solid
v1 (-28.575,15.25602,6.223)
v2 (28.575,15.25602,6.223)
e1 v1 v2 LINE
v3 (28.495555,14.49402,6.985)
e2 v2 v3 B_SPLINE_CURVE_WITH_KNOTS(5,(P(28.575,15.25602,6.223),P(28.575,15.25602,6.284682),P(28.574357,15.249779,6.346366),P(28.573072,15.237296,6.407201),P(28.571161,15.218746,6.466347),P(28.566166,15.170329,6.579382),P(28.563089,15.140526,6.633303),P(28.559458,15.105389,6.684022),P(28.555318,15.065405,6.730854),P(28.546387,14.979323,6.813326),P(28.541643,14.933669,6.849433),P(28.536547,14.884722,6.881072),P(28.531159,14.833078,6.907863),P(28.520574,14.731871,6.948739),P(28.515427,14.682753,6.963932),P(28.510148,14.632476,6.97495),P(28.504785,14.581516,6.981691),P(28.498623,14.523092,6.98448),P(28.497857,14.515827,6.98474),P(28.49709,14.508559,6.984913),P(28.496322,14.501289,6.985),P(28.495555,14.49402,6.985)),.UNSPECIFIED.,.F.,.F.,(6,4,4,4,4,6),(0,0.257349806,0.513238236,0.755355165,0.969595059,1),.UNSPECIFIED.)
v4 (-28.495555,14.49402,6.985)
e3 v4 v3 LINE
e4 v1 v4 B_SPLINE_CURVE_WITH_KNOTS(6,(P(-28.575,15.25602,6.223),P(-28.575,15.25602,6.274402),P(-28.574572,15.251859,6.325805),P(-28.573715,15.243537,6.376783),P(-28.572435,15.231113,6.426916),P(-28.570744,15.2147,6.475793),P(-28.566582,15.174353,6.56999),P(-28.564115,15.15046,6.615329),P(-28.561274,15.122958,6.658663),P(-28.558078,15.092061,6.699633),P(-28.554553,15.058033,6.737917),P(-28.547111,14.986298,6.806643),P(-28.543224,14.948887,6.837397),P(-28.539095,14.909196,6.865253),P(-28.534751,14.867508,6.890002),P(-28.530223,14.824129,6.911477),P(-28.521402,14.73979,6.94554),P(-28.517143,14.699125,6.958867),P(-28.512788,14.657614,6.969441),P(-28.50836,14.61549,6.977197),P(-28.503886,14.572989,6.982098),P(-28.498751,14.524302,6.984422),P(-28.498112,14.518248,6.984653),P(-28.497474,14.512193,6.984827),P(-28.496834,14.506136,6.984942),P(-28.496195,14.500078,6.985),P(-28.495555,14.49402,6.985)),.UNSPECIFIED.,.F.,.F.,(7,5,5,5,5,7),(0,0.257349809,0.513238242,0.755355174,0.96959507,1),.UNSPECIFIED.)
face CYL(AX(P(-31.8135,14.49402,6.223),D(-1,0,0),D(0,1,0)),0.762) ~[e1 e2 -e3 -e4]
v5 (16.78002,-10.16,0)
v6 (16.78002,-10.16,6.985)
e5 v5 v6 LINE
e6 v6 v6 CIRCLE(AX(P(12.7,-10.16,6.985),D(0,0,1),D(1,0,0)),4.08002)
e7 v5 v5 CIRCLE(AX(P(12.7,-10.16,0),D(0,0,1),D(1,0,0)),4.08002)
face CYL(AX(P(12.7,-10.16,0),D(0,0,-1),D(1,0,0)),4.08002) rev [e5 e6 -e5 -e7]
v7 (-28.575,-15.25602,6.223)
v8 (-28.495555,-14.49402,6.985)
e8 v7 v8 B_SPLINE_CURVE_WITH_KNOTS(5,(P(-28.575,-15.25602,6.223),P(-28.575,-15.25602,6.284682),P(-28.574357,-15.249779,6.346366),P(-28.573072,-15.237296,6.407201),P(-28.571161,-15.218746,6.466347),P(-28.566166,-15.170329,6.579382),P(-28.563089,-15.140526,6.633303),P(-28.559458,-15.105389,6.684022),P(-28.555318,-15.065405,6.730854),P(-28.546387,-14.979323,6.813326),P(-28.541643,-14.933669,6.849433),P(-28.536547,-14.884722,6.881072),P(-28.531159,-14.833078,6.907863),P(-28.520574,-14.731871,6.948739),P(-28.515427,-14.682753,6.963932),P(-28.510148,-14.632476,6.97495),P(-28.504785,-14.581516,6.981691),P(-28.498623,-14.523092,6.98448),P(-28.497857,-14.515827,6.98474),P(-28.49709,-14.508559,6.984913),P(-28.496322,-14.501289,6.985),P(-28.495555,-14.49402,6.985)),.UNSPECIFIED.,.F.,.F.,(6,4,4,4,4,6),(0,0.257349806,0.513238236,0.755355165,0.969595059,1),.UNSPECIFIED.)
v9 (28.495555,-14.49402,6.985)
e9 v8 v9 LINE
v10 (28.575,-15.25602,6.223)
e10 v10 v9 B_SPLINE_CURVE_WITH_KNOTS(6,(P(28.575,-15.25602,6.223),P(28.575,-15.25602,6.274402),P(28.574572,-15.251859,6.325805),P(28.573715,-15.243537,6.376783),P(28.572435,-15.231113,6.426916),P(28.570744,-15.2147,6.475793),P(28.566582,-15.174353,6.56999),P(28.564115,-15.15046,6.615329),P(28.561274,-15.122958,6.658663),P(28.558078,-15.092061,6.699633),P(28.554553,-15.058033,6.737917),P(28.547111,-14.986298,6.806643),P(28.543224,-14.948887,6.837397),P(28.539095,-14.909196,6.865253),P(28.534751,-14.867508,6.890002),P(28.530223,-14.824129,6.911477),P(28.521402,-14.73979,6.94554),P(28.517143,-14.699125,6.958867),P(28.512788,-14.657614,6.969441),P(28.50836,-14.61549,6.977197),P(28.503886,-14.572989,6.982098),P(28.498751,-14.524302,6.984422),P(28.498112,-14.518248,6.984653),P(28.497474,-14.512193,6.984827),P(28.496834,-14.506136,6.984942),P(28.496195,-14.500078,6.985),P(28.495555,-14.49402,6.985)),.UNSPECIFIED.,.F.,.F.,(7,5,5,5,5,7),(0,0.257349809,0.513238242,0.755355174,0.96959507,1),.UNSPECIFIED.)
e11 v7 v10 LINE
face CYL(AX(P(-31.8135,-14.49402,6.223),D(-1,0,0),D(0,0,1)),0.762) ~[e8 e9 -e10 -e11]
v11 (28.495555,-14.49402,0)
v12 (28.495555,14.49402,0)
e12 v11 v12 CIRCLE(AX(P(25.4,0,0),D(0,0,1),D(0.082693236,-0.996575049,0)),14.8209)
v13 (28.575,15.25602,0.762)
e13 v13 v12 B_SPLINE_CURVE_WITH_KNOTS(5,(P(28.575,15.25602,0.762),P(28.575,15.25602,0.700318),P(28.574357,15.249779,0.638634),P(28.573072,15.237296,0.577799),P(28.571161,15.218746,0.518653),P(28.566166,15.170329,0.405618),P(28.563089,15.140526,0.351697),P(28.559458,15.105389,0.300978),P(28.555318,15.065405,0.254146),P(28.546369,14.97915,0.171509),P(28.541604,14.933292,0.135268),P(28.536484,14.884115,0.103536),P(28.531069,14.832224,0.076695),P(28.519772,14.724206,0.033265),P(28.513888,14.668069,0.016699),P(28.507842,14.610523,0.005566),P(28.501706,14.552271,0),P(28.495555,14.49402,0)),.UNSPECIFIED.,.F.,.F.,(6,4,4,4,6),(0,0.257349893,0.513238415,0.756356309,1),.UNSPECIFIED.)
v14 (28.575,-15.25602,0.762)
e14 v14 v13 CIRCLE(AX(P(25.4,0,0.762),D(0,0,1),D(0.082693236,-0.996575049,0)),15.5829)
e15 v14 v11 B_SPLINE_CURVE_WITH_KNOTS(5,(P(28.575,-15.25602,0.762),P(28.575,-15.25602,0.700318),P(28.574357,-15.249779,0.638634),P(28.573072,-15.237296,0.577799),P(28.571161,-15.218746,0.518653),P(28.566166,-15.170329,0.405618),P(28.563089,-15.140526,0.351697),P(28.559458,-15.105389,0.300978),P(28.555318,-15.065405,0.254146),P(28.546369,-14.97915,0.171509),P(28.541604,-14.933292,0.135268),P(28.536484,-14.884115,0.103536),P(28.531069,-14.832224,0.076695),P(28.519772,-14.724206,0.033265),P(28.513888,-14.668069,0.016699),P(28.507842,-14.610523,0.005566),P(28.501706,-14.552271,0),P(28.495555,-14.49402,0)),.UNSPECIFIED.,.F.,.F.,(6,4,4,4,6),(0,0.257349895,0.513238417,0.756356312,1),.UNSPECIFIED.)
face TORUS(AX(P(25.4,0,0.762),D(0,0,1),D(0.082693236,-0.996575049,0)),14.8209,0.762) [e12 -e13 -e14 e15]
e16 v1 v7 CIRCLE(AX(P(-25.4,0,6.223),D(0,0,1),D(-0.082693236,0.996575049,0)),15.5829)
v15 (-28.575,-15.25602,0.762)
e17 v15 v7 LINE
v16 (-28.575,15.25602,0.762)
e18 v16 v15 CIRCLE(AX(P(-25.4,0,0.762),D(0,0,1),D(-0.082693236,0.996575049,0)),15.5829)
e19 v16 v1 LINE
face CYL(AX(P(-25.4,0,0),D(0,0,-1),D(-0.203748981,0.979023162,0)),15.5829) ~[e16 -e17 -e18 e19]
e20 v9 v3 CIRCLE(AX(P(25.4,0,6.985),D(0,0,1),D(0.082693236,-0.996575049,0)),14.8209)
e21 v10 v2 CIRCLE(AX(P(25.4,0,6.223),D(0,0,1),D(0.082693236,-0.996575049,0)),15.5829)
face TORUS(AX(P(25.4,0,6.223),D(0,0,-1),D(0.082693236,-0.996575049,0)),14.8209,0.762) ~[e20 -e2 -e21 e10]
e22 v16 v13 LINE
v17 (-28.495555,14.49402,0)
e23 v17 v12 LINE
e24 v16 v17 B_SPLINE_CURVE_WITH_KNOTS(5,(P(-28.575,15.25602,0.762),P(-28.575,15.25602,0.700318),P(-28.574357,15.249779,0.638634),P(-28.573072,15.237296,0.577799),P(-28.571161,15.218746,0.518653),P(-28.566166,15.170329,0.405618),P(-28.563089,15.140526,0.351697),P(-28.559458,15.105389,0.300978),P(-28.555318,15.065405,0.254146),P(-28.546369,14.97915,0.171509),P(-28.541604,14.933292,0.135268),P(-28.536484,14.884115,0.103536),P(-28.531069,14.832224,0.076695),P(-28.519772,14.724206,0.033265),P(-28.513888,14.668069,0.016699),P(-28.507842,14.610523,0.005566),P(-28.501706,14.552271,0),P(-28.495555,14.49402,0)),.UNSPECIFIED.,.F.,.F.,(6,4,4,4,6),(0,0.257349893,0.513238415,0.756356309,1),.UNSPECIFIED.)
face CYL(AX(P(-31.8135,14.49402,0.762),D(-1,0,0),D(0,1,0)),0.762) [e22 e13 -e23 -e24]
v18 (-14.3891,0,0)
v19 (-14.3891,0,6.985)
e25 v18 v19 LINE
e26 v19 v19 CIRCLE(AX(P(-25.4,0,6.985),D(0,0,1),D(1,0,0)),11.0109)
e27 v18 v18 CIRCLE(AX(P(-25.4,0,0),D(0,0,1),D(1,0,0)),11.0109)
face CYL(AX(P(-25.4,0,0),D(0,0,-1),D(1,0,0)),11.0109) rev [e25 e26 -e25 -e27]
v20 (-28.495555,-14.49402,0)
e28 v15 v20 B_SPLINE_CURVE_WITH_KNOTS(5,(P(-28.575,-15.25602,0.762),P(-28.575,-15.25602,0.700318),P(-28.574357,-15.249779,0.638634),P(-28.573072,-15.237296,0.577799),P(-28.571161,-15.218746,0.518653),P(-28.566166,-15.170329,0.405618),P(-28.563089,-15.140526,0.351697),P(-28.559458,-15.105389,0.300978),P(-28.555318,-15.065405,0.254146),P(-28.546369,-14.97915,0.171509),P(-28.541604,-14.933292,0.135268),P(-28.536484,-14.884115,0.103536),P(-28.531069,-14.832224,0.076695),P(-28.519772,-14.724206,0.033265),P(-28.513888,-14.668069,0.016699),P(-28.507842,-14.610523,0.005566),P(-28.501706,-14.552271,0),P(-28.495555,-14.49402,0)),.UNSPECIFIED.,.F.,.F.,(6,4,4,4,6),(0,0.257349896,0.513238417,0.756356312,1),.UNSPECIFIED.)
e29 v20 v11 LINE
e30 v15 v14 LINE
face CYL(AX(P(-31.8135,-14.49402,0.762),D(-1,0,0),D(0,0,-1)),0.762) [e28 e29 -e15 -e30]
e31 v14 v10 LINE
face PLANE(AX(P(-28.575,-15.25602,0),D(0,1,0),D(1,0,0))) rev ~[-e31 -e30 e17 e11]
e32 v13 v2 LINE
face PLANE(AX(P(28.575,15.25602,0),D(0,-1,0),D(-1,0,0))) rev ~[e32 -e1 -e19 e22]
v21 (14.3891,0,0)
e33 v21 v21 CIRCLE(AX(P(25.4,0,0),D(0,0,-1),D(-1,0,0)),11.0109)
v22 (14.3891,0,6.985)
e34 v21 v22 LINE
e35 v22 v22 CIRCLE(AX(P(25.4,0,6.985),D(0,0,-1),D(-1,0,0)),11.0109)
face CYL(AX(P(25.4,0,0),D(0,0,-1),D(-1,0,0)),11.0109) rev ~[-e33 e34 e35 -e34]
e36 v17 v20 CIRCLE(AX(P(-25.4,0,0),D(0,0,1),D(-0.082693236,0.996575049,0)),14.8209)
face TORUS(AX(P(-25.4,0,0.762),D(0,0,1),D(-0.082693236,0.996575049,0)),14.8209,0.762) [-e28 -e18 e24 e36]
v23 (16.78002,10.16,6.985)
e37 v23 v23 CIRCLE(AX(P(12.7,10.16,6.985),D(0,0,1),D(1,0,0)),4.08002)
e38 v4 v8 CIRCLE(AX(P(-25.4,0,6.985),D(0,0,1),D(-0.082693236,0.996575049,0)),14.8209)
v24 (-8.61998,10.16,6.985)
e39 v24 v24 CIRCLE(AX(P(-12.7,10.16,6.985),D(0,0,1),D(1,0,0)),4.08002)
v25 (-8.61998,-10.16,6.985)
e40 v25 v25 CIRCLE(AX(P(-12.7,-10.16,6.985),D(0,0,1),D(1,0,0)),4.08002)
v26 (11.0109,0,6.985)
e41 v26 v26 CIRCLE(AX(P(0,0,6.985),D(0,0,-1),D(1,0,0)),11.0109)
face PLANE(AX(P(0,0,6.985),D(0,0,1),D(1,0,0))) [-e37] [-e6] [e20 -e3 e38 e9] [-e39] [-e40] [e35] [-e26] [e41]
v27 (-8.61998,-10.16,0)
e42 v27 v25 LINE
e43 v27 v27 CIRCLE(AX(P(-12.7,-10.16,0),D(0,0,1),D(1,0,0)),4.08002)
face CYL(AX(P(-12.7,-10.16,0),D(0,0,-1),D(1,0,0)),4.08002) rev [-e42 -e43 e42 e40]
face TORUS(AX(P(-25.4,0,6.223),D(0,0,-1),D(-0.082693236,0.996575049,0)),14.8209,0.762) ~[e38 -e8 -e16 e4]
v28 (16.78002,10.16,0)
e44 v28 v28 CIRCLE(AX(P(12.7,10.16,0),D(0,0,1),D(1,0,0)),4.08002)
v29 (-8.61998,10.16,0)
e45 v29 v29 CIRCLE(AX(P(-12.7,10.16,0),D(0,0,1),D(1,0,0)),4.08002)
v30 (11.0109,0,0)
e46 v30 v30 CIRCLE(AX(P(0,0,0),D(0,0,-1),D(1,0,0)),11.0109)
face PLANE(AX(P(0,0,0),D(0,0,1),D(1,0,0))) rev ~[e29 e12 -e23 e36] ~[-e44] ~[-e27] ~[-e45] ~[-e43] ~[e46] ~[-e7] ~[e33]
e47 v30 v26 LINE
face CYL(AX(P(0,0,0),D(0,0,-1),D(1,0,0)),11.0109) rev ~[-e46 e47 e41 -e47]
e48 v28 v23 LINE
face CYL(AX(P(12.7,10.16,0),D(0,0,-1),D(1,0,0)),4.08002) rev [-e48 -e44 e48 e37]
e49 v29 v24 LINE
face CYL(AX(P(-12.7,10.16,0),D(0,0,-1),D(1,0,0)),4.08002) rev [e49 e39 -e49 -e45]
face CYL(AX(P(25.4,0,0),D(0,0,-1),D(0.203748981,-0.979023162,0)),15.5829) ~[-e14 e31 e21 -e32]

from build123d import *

# Parameters (mm, degrees)
F0_R        = 4.0800200383
F0_R_2      = 11.0109
F1_DEPTH    = 6.985
F2_T1_DEPTH = 63.627
F2_T4_ANGLE = 170.5132200492
F2_T6_ANGLE = 170.5132200492
F3_T1_DEPTH = 63.627
F3_T4_ANGLE = 170.5132200492
F3_T6_ANGLE = 170.5132200492


# Not quite as in the source:
# - a fillet or chamfer that OpenCascade refuses, or shapes differently, is made with other operations: its cross-section is extruded or revolved along the edge and cut away or added


with BuildPart() as f1:
    # F0 (on Top) → F1 (new body)
    with BuildSketch(Plane.XY):
        with BuildLine():
            Line((28.575, 15.2560200383), (-28.575, 15.2560200383))
            ThreePointArc((-28.575, 15.2560200383), (-40.9829, 0), (-28.575, -15.2560200383))
            Line((-28.575, -15.2560200383), (28.575, -15.2560200383))
            ThreePointArc((28.575, -15.2560200383), (40.9829, 0), (28.575, 15.2560200383))
        make_face()
        with Locations((-12.7, -10.16)):
            Circle(F0_R, mode=Mode.SUBTRACT)
        with Locations((12.7, -10.16)):
            Circle(F0_R, mode=Mode.SUBTRACT)
        with Locations((-25.4, 0)):
            Circle(F0_R_2, mode=Mode.SUBTRACT)
        with Locations((-12.7, 10.16)):
            Circle(F0_R, mode=Mode.SUBTRACT)
        with BuildLine():
            ThreePointArc((-11.0109, 0), (0, 11.0109), (11.0109, 0))
            ThreePointArc((11.0109, 0), (0, -11.0109), (-11.0109, 0))
        make_face(mode=Mode.SUBTRACT)
        with BuildLine():
            ThreePointArc((36.4109, 0), (25.4, -11.0109), (14.3891, 0))
            ThreePointArc((14.3891, 0), (25.4, 11.0109), (36.4109, 0))
        make_face(mode=Mode.SUBTRACT)
        with Locations((12.7, 10.16)):
            Circle(F0_R, mode=Mode.SUBTRACT)
    extrude(amount=F1_DEPTH)

    # F2: fillet of radius 0.762 on 4 edges, made by hand

    # F2_s2 → F2_t1 (cut)
    with BuildSketch(Plane.YZ.offset(-31.8135)):
        with BuildLine():
            ThreePointArc((-14.4940200383, 6.985), (-15.0328354056, 6.7618153673), (-15.2560200383, 6.223))
            Line((-15.2560200383, 6.223), (-15.2560200383, 6.985))
            Line((-15.2560200383, 6.985), (-14.4940200383, 6.985))
        make_face()
        with BuildLine():
            ThreePointArc((15.2560200383, 6.223), (15.0328354056, 6.7618153673), (14.4940200383, 6.985))
            Line((14.4940200383, 6.985), (15.2560200383, 6.985))
            Line((15.2560200383, 6.985), (15.2560200383, 6.223))
        make_face()
    extrude(amount=F2_T1_DEPTH, mode=Mode.SUBTRACT)

    # F2_s3 → F2_t4 (revolve, cut)
    with BuildSketch(Plane(origin=(-25.2263104474, -2.0932144122, 0), x_dir=(0, 0, 1), z_dir=(0.9965750492, 0.0826932365, 0))):
        with BuildLine():
            ThreePointArc((6.985, -16.921308207), (6.7618153673, -17.4601235742), (6.223, -17.683308207))
            Line((6.223, -17.683308207), (6.985, -17.683308207))
            Line((6.985, -17.683308207), (6.985, -16.921308207))
        make_face()
    revolve(axis=Axis((-25.4, 0, 6.985), (0, 0, 1)), revolution_arc=F2_T4_ANGLE, mode=Mode.SUBTRACT)

    # F2_s5 → F2_t6 (revolve, cut)
    with BuildSketch(Plane(origin=(25.2263104474, 2.0932144122, 0), x_dir=(0, 0, 1), z_dir=(-0.9965750492, -0.0826932365, 0))):
        with BuildLine():
            ThreePointArc((6.985, -16.921308207), (6.7618153673, -17.4601235742), (6.223, -17.683308207))
            Line((6.223, -17.683308207), (6.985, -17.683308207))
            Line((6.985, -17.683308207), (6.985, -16.921308207))
        make_face()
    revolve(axis=Axis((25.4, 0, 6.985), (0, 0, 1)), revolution_arc=F2_T6_ANGLE, mode=Mode.SUBTRACT)

    # F3: fillet of radius 0.762 on 4 edges, made by hand

    # F3_s2 → F3_t1 (cut)
    with BuildSketch(Plane.YZ.offset(-31.8135)):
        with BuildLine():
            ThreePointArc((15.2560200383, 0.762), (15.0328354056, 0.2231846327), (14.4940200383, 0))
            Line((14.4940200383, 0), (15.2560200383, 0))
            Line((15.2560200383, 0), (15.2560200383, 0.762))
        make_face()
        with BuildLine():
            ThreePointArc((-14.4940200383, 0), (-15.0328354056, 0.2231846327), (-15.2560200383, 0.762))
            Line((-15.2560200383, 0.762), (-15.2560200383, 0))
            Line((-15.2560200383, 0), (-14.4940200383, 0))
        make_face()
    extrude(amount=F3_T1_DEPTH, mode=Mode.SUBTRACT)

    # F3_s3 → F3_t4 (revolve, cut)
    with BuildSketch(Plane(origin=(-25.2263104474, -2.0932144122, 0), x_dir=(0, 0, 1), z_dir=(0.9965750492, 0.0826932365, 0))):
        with BuildLine():
            ThreePointArc((0, -16.921308207), (0.2231846327, -17.4601235742), (0.762, -17.683308207))
            Line((0.762, -17.683308207), (0, -17.683308207))
            Line((0, -17.683308207), (0, -16.921308207))
        make_face()
    revolve(axis=Axis((-25.4, 0, 0), (0, 0, 1)), revolution_arc=F3_T4_ANGLE, mode=Mode.SUBTRACT)

    # F3_s5 → F3_t6 (revolve, cut)
    with BuildSketch(Plane(origin=(25.2263104474, 2.0932144122, 0), x_dir=(0, 0, 1), z_dir=(-0.9965750492, -0.0826932365, 0))):
        with BuildLine():
            ThreePointArc((0, -16.921308207), (0.2231846327, -17.4601235742), (0.762, -17.683308207))
            Line((0.762, -17.683308207), (0, -17.683308207))
            Line((0, -17.683308207), (0, -16.921308207))
        make_face()
    revolve(axis=Axis((25.4, 0, 0), (0, 0, 1)), revolution_arc=F3_T6_ANGLE, mode=Mode.SUBTRACT)


solid = f1.part
